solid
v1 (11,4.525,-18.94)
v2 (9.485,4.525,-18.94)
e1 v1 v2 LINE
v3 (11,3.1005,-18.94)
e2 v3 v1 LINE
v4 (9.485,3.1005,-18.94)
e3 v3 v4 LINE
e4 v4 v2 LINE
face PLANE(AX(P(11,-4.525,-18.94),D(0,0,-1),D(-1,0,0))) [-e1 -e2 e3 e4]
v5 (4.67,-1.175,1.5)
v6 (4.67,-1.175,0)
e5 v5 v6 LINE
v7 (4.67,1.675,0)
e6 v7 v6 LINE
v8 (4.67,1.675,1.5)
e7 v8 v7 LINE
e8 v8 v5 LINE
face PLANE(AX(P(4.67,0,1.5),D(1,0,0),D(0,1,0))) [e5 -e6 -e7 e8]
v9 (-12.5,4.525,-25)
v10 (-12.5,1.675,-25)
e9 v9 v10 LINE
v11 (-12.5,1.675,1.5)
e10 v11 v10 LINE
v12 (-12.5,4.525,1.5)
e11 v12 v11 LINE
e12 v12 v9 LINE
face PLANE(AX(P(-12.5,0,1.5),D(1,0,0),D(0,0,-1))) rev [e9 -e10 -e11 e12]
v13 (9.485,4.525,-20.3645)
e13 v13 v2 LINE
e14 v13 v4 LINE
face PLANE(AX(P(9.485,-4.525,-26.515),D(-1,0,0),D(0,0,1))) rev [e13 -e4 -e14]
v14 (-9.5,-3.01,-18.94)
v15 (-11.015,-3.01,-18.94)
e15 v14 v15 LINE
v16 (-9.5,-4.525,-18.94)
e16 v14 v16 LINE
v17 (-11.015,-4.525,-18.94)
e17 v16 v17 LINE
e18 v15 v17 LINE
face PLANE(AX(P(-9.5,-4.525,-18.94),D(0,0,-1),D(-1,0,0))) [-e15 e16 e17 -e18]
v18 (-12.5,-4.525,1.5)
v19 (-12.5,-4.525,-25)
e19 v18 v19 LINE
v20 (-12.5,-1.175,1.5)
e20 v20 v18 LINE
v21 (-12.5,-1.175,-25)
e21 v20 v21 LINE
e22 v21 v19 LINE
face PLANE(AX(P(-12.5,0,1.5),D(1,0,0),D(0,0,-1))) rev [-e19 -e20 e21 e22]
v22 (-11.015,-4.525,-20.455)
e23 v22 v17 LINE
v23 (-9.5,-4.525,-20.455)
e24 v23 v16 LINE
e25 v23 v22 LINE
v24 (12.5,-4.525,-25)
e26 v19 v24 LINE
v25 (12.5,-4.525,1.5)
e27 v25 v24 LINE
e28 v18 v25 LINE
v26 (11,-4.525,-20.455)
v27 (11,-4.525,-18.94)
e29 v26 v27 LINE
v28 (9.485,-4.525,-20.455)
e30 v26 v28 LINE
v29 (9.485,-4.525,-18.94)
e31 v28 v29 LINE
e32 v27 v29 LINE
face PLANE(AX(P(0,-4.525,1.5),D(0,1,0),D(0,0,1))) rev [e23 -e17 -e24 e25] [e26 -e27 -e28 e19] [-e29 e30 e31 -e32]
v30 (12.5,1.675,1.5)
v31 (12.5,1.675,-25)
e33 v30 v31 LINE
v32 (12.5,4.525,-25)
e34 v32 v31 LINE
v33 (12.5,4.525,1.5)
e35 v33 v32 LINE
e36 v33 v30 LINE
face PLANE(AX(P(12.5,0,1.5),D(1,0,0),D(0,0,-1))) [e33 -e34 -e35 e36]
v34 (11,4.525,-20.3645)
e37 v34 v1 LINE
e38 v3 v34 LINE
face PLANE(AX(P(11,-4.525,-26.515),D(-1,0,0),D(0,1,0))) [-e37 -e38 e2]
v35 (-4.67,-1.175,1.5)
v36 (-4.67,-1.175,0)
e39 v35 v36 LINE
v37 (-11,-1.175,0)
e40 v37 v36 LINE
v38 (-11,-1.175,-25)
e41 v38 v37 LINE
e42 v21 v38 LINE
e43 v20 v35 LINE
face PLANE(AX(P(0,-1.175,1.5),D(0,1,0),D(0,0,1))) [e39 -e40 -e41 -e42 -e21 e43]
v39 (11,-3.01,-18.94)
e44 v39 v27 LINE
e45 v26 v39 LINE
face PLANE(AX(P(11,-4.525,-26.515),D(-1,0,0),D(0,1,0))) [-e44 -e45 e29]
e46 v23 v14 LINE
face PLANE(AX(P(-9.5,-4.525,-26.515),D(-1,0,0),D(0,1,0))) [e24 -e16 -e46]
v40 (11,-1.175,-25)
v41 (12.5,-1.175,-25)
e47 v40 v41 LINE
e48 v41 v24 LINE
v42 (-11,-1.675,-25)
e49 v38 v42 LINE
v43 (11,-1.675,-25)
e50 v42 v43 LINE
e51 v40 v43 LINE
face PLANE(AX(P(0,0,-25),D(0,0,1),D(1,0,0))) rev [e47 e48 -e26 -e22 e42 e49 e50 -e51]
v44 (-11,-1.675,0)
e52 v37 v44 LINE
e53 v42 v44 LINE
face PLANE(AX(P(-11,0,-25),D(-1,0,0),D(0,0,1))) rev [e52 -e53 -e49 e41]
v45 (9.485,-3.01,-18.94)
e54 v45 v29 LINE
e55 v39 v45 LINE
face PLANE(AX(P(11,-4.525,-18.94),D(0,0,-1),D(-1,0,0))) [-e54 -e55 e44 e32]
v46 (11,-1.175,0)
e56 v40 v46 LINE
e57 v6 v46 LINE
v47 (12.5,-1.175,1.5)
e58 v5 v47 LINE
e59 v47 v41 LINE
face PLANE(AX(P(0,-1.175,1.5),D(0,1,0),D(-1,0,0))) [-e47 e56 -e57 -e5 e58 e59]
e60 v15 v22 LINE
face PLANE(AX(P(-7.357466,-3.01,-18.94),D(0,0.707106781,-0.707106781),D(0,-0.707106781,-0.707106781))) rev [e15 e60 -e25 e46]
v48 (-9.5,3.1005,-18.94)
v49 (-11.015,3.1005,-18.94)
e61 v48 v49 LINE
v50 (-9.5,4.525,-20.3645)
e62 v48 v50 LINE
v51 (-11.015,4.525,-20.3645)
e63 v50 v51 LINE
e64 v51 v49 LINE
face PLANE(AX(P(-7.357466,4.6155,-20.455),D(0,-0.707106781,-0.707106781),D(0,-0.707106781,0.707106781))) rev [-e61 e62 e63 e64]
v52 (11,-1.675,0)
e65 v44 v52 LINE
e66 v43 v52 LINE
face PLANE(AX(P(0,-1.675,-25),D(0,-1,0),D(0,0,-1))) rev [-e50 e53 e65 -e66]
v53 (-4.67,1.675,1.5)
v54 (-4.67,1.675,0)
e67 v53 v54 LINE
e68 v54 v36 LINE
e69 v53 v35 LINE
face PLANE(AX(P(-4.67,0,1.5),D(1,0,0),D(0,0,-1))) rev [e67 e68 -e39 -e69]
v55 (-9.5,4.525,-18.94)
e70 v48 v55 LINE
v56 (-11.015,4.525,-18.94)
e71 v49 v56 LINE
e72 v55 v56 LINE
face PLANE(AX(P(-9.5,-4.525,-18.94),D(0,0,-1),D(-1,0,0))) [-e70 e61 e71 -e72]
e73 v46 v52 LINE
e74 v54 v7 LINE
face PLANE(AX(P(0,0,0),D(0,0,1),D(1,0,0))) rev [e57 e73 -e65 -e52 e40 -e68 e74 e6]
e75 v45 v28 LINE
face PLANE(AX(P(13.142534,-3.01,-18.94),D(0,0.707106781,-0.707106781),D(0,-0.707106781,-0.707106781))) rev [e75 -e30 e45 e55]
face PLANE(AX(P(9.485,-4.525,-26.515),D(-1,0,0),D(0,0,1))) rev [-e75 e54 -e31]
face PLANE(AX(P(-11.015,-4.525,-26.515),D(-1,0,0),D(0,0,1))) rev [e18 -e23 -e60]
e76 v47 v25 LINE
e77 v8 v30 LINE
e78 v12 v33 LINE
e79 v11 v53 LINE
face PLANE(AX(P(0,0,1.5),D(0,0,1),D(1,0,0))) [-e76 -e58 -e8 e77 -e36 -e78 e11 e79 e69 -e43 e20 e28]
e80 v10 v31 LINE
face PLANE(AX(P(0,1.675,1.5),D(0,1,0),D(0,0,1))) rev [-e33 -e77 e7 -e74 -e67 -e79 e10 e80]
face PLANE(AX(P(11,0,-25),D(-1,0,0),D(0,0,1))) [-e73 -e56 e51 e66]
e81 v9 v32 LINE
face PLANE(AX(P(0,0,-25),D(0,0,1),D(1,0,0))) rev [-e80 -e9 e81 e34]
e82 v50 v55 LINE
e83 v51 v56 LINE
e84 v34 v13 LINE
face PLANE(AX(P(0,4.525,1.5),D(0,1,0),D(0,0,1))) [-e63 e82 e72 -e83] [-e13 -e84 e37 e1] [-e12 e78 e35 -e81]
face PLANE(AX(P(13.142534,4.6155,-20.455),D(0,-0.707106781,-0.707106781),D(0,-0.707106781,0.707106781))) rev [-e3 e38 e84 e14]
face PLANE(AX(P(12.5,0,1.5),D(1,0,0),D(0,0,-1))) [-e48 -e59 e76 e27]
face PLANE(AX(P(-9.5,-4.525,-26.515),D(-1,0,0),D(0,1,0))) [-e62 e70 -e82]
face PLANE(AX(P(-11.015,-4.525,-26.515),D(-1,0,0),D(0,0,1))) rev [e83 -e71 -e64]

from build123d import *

# Parameters (mm, degrees)
SKETCH1_W           = 9.34
SKETCH1_H           = 3.35
SKETCH1_W_2         = 1.5
SKETCH1_H_2         = 0.5
SKETCH1_W_3         = 6.33
BOSS_EXTRUDE1_DEPTH = 1.5
SKETCH1_6_W         = 1.5
SKETCH1_6_H         = 0.5
BOSS_EXTRUDE4_DEPTH = 25
CAVITY1_START       = -11.015
CAVITY1_DEPTH       = 1.515
CAVITY1_START_2     = 9.485
CAVITY1_2_DEPTH     = 1.515


# Read off the part's stored shape, not the designer's step: Cavity1
with BuildPart() as part:
    # Sketch1 → Boss-Extrude1 (new body)
    with BuildSketch(Plane.XY):
        Rectangle(SKETCH1_W, SKETCH1_H)
        Polygon((11, -1.675), (4.67, -1.675), (-4.67, -1.675), (-11, -1.675), (-12.5, -1.675), (-12.5, -4.525), (12.5, -4.525), (12.5, -1.675), align=None)
        Polygon((-4.67, 1.675), (4.67, 1.675), (12.5, 1.675), (12.5, 4.525), (-12.5, 4.525), (-12.5, 1.675), align=None)
        with Locations((11.75, -1.425)):
            Rectangle(SKETCH1_W_2, SKETCH1_H_2)
        with Locations((7.835, -1.425)):
            Rectangle(SKETCH1_W_3, SKETCH1_H_2)
        with Locations((-11.75, -1.425)):
            Rectangle(SKETCH1_W_2, SKETCH1_H_2)
        with Locations((-7.835, -1.425)):
            Rectangle(SKETCH1_W_3, SKETCH1_H_2)
    extrude(amount=BOSS_EXTRUDE1_DEPTH)

    # Sketch1<6> → Boss-Extrude4 (add)
    with BuildSketch(Plane.XY):
        Polygon((11, -1.675), (4.67, -1.675), (-4.67, -1.675), (-11, -1.675), (-12.5, -1.675), (-12.5, -4.525), (12.5, -4.525), (12.5, -1.675), align=None)
        Polygon((-4.67, 1.675), (4.67, 1.675), (12.5, 1.675), (12.5, 4.525), (-12.5, 4.525), (-12.5, 1.675), align=None)
        with Locations((11.75, -1.425)):
            Rectangle(SKETCH1_6_W, SKETCH1_6_H)
        with Locations((-11.75, -1.425)):
            Rectangle(SKETCH1_6_W, SKETCH1_6_H)
    extrude(amount=-BOSS_EXTRUDE4_DEPTH)

    # Cavity1 outline → Cavity1 (cut)
    with BuildSketch(Plane.YZ.offset(CAVITY1_START)):
        Polygon((-4.525, -18.94), (-4.525, -20.455), (-3.01, -18.94), align=None)
        Polygon((4.525, -18.94), (3.1005, -18.94), (4.525, -20.3645), align=None)
    extrude(amount=CAVITY1_DEPTH, mode=Mode.SUBTRACT)

    # Cavity1 2 outline → Cavity1 2 (cut)
    with BuildSketch(Plane.YZ.offset(CAVITY1_START_2)):
        Polygon((-4.525, -18.94), (-4.525, -20.455), (-3.01, -18.94), align=None)
        Polygon((4.525, -18.94), (3.1005, -18.94), (4.525, -20.3645), align=None)
    extrude(amount=CAVITY1_2_DEPTH, mode=Mode.SUBTRACT)


solid = part.part
